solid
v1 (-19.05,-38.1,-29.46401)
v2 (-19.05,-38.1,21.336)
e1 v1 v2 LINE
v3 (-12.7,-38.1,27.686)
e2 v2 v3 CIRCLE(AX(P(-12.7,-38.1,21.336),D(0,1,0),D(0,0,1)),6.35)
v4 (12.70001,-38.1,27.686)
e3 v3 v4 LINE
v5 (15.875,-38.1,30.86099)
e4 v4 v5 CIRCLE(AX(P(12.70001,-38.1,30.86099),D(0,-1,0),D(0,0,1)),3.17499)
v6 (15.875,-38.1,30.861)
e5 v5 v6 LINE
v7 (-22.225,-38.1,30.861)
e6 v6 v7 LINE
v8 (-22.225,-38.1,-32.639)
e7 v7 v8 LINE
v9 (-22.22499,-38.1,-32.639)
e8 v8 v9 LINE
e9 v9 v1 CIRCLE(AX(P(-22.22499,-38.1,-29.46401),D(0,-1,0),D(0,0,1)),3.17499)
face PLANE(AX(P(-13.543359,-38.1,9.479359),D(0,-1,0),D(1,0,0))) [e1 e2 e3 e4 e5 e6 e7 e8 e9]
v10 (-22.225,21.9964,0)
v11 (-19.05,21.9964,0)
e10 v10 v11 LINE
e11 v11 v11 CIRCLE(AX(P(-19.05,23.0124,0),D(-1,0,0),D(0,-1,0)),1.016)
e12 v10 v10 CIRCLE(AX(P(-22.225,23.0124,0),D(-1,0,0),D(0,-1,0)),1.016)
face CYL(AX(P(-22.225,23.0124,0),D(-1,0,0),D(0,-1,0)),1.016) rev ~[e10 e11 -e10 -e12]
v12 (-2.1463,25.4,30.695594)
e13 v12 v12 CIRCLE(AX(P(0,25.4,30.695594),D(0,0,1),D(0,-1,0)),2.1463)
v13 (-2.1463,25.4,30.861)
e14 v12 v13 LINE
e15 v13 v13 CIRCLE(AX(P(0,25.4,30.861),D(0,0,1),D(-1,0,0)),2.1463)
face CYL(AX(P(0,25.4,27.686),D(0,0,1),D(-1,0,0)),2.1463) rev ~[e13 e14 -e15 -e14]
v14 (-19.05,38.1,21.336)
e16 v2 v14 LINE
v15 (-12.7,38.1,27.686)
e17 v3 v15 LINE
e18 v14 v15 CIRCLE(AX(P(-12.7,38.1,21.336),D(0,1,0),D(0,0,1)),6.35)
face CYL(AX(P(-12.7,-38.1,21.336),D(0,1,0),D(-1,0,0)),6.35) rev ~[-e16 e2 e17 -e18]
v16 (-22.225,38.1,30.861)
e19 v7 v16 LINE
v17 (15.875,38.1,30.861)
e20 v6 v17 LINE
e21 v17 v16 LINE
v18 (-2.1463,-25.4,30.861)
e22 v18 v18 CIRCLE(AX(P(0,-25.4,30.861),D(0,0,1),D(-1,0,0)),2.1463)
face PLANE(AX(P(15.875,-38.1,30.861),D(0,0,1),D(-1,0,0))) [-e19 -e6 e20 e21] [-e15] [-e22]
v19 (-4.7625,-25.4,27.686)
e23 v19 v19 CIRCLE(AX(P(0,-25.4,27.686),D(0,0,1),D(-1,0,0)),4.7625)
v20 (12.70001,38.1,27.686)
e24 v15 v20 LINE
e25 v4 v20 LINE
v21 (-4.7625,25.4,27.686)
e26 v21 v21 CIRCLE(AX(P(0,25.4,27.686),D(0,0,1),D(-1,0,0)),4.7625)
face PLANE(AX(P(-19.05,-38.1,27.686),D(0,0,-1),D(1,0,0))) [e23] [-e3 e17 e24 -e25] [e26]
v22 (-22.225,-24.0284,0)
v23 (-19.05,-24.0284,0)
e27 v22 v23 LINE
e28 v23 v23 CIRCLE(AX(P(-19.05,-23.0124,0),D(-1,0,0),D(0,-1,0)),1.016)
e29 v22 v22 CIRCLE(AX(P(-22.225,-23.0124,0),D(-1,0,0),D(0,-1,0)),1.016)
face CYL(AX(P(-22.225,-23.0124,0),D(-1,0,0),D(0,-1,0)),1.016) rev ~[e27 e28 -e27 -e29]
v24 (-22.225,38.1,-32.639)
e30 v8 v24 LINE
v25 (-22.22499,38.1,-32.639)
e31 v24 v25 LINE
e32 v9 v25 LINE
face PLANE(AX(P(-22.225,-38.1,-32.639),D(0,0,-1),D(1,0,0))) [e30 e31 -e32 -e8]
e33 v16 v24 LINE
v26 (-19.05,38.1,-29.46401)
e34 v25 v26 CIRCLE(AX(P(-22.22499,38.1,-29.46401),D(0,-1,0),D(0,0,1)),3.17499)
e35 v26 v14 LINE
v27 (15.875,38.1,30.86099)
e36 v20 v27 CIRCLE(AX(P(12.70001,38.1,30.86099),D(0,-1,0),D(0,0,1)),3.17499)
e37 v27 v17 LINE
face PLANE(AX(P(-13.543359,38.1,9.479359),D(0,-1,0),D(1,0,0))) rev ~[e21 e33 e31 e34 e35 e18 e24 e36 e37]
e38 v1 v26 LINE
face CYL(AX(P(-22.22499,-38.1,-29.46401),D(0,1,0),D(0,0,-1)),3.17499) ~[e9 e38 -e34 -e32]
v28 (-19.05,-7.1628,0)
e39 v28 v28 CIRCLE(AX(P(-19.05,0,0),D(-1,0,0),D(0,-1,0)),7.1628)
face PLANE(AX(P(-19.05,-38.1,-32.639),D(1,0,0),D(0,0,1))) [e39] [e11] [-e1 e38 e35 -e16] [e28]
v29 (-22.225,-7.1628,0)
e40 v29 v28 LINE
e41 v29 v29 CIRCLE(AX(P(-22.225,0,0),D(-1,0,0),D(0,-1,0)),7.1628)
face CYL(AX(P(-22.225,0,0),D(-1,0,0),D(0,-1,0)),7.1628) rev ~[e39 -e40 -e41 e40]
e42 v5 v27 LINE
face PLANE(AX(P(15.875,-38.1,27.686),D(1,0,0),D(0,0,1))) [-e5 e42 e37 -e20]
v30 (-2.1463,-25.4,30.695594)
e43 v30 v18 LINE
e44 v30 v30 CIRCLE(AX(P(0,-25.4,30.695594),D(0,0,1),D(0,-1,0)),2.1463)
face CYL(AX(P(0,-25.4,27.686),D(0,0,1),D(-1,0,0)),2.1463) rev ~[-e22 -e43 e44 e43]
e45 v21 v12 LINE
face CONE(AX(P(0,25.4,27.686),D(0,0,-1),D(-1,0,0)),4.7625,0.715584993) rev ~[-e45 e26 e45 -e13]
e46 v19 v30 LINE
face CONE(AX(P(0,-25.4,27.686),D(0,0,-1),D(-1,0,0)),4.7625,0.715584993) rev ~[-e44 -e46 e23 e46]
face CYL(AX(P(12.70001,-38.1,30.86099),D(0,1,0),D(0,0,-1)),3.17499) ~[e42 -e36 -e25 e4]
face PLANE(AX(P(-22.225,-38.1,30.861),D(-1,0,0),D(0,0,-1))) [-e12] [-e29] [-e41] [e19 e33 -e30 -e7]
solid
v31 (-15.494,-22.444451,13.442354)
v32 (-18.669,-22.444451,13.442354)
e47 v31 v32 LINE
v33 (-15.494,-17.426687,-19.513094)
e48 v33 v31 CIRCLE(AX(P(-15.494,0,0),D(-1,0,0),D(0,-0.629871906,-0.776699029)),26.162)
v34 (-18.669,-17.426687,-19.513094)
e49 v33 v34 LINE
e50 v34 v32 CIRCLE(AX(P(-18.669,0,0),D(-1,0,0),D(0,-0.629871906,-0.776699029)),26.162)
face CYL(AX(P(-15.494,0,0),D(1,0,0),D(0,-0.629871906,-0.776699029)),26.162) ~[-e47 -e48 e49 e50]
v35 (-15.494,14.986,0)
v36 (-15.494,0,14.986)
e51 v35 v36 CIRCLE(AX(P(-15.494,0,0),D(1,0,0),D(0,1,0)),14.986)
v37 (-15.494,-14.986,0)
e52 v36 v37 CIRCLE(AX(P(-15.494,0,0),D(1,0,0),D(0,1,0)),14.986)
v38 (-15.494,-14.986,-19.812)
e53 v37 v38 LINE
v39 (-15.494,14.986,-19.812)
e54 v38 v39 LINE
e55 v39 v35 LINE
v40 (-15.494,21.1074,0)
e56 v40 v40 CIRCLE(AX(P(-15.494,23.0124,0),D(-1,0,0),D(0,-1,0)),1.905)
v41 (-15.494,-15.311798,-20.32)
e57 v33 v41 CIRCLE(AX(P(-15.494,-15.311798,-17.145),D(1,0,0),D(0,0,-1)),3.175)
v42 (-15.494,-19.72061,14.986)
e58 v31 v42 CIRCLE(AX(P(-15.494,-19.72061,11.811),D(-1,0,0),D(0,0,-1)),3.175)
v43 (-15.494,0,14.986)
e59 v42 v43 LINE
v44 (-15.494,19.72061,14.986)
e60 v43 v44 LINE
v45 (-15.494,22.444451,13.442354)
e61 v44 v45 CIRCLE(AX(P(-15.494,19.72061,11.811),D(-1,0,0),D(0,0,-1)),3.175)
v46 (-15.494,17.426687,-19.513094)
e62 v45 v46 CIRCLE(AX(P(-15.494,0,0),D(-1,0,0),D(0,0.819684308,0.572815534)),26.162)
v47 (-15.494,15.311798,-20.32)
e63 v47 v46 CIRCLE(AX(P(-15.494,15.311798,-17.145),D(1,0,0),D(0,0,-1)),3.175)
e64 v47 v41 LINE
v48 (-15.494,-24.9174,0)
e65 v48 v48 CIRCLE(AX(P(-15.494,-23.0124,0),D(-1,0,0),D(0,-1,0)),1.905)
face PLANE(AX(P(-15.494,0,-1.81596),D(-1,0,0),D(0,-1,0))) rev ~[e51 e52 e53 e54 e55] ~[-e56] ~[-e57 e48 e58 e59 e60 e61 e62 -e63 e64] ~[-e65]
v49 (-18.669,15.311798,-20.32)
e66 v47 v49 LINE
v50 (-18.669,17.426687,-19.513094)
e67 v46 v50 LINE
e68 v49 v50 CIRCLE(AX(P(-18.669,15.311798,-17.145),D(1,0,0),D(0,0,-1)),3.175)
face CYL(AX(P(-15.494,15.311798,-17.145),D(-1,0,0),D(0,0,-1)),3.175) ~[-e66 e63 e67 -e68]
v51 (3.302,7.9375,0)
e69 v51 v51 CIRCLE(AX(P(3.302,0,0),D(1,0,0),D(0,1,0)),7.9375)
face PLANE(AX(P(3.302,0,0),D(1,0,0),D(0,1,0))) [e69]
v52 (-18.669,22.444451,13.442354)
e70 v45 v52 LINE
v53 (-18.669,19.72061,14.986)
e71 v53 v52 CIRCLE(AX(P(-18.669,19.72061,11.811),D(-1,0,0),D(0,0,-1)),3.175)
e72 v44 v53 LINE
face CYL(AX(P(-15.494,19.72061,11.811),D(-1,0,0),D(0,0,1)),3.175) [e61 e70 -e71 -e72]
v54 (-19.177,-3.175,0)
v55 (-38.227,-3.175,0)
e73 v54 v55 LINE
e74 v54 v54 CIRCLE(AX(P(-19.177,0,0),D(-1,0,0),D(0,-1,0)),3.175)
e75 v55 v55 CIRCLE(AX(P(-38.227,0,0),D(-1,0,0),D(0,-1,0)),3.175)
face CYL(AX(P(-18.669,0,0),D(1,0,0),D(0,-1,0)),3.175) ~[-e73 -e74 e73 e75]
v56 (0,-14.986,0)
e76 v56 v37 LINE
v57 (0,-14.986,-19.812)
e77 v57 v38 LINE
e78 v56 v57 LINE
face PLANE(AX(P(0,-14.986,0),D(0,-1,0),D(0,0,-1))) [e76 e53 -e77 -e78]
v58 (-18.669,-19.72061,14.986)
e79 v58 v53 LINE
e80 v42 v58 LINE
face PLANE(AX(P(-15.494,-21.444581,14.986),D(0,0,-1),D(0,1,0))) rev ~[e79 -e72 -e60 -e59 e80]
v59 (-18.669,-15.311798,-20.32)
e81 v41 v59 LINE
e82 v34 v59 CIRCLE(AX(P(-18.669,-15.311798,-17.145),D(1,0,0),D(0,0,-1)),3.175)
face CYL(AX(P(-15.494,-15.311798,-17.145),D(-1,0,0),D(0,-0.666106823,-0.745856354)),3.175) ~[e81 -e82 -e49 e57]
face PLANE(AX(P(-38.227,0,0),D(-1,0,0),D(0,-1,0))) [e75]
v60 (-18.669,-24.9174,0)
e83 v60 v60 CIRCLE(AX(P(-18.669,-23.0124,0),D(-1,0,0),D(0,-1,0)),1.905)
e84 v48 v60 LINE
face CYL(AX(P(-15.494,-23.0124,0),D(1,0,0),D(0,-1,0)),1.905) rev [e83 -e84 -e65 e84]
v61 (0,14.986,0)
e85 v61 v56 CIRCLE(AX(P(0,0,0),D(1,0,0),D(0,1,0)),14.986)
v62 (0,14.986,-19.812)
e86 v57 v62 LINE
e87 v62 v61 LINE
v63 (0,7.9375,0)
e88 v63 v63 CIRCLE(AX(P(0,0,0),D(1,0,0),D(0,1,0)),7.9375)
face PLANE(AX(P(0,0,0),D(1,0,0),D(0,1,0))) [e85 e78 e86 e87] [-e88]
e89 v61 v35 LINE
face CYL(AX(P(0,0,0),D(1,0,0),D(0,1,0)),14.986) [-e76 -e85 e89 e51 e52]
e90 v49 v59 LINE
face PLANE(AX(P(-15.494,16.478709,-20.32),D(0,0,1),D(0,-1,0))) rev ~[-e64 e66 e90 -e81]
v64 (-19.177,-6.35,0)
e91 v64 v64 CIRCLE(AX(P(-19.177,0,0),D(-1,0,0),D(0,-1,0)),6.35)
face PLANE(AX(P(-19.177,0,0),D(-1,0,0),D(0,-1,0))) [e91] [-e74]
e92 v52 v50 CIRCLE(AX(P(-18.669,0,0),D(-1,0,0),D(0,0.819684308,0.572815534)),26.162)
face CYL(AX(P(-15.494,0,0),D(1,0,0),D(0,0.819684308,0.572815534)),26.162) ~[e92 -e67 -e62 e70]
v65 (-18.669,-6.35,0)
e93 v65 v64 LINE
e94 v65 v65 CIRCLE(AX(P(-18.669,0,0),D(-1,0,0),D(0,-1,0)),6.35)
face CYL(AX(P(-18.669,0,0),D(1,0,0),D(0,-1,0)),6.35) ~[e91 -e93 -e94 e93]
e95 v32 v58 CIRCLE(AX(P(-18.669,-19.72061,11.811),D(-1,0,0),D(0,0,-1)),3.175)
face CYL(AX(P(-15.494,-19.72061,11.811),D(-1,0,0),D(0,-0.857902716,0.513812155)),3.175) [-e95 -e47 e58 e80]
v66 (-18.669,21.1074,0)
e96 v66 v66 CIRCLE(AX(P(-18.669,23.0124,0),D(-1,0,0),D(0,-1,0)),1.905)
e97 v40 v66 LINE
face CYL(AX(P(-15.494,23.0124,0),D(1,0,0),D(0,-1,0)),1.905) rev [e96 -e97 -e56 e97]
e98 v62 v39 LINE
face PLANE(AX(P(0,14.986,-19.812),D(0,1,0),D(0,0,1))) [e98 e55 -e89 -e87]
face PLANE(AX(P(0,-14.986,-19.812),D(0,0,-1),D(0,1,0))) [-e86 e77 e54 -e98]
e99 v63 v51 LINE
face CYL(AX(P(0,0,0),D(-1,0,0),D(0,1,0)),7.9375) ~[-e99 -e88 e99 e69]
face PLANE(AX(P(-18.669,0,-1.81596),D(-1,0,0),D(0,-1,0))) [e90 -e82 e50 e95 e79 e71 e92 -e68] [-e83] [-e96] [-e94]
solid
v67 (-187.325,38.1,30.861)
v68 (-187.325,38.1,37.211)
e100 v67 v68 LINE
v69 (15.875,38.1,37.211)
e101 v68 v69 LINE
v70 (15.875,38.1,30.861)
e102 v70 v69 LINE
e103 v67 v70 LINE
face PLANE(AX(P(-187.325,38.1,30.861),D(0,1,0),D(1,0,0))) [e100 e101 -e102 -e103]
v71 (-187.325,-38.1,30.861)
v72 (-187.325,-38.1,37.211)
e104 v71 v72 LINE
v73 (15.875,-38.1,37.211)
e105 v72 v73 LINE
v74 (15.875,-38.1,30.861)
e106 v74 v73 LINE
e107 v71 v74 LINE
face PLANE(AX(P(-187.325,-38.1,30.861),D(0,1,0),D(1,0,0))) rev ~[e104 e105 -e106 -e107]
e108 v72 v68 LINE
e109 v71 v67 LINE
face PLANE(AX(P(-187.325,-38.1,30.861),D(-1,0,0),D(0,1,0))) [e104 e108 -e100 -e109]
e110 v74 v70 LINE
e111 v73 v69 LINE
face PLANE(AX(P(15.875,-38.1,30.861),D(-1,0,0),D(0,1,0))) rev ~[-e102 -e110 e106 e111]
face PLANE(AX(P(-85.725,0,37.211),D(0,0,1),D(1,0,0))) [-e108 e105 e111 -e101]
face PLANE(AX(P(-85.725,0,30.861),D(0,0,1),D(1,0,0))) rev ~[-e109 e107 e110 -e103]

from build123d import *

# Parameters (mm, degrees)
F0_R            = 7.9375
F1_DEPTH        = 3.302
F2_DEPTH        = 15.494
F3_R            = 1.905
F3_R_2          = 3.175
F4_DEPTH        = 3.175
F5_R            = 3.175
F6_DEPTH        = 19.558
F5_R_2          = 6.35
F7_DEPTH        = 0.508
F8_R            = 3.175
F11_DEPTH       = 76.2
F12_R           = 3.17499
F13_R           = 6.35
F14_R           = 7.1628
F14_R_2         = 1.016
F15_DEPTH       = 25.4
F17_W           = 203.2
F17_H           = 76.2
F18_DEPTH       = 6.35
F20_D           = 4.2926
F20_DEPTH       = 19.05
F20_CSINK_D     = 9.525
F20_CSINK_ANGLE = 82
F20_TIP         = 1.2896271466


# Not quite as in the source:
# - a fillet or chamfer is up to 0.001 mm smaller than in the source, because OpenCascade refuses the exact size


with BuildPart() as f1:
    # F0 (on Right) → F1 (new body)
    with BuildSketch(Plane.YZ):
        Circle(F0_R)
    extrude(amount=F1_DEPTH)

    # F0 (on Right) → F2 (join)
    with BuildSketch(Plane.YZ):
        with BuildLine():
            ThreePointArc((-14.986, 0), (0, -14.986), (14.986, 0))
            ThreePointArc((14.986, 0), (0, 14.986), (-14.986, 0))
        make_face()
        Circle(F0_R, mode=Mode.SUBTRACT)
        with BuildLine():
            Line((14.986, -19.812), (14.986, 0))
            ThreePointArc((14.986, 0), (0, -14.986), (-14.986, 0))
            Line((-14.986, 0), (-14.986, -19.812))
            Line((-14.986, -19.812), (14.986, -19.812))
        make_face()
        Circle(F0_R)
    extrude(amount=-F2_DEPTH)

    # F3 (on face) → F4 (join)
    with BuildSketch(Plane(origin=(-15.494, 0, 0), x_dir=(0, -1, 0), z_dir=(-1, 0, 0))):
        with BuildLine():
            Line((-2.18e-08, 14.986), (-21.4445808539, 14.986))
            ThreePointArc((-21.4445808539, 14.986), (-25.9069948799, -3.6438798406), (-16.4787088086, -20.32))
            Line((-16.4787088086, -20.32), (16.4787088086, -20.32))
            ThreePointArc((16.4787088086, -20.32), (25.9069948799, -3.6438798406), (21.4445808539, 14.986))
            Line((21.4445808539, 14.986), (-2.18e-08, 14.986))
        make_face()
        with Locations((-23.0124, 0)):
            Circle(F3_R, mode=Mode.SUBTRACT)
        with BuildLine():
            ThreePointArc((-14.986, 0), (-10.5967022306, 10.5967022152), (-2.18e-08, 14.986))
            ThreePointArc((-2.18e-08, 14.986), (10.5967022152, 10.5967022306), (14.986, 0))
            Line((14.986, 0), (14.986, -19.812))
            Line((14.986, -19.812), (-14.986, -19.812))
            Line((-14.986, -19.812), (-14.986, 0))
        make_face(mode=Mode.SUBTRACT)
        with Locations((23.0124, 0)):
            Circle(F3_R, mode=Mode.SUBTRACT)
        with BuildLine():
            ThreePointArc((14.986, 0), (10.5967022152, 10.5967022306), (-2.18e-08, 14.986))
            ThreePointArc((-2.18e-08, 14.986), (-10.5967022306, 10.5967022152), (-14.986, 0))
            Line((-14.986, 0), (-14.986, -19.812))
            Line((-14.986, -19.812), (14.986, -19.812))
            Line((14.986, -19.812), (14.986, 0))
        make_face()
        Circle(F3_R_2, mode=Mode.SUBTRACT)
        Circle(F3_R_2)
    extrude(amount=F4_DEPTH)

    # F5 (on face) → F6 (join)
    with BuildSketch(Plane(origin=(-18.669, 0, 0), x_dir=(0, -1, 0), z_dir=(-1, 0, 0))):
        Circle(F5_R)
    extrude(amount=F6_DEPTH)

    # F5 (on face) → F7 (join)
    with BuildSketch(Plane(origin=(-18.669, 0, 0), x_dir=(0, -1, 0), z_dir=(-1, 0, 0))):
        Circle(F5_R_2)
        Circle(F5_R, mode=Mode.SUBTRACT)
    extrude(amount=F7_DEPTH)

    # F8
    f8_edges = [f1.edges().sort_by_distance(p)[0] for p in [
        (-17.0815, -21.444581, 14.986),
        (-17.0815, 21.444581, 14.986),
        (-17.0815, 16.478709, -20.32),
        (-17.0815, -16.478709, -20.32),
    ]]
    fillet(f8_edges, radius=F8_R)


with BuildPart() as f11:
    # F10 (on offset) → F11 (new body)
    with BuildSketch(Plane.XZ.offset(38.1)):
        Polygon((-22.225, 30.861), (-22.225, -32.639), (-19.05, -32.639), (-19.05, 27.686), (15.875, 27.686), (15.875, 30.861), align=None)
    extrude(amount=-F11_DEPTH)

    # F12 (radius 3.175 in the source; OpenCascade refuses exactly that, so slightly less here)
    f12_edges = [f11.edges().sort_by_distance(p)[0] for p in [
        (15.875, 0, 27.686),
        (-19.05, 0, -32.639),
    ]]
    fillet(f12_edges, radius=F12_R)

    # F13
    f13_edges = [f11.edges().sort_by_distance(p)[0] for p in [
        (-19.05, 0, 27.686),
    ]]
    fillet(f13_edges, radius=F13_R)

    # F14 (on face) → F15 (cut)
    with BuildSketch(Plane(origin=(-22.225, 0, 0), x_dir=(0, -1, 0), z_dir=(-1, 0, 0))):
        Circle(F14_R)
        with Locations((23.0124, 0)):
            Circle(F14_R_2)
        with Locations((-23.0124, 0)):
            Circle(F14_R_2)
    extrude(amount=-F15_DEPTH, mode=Mode.SUBTRACT)

    # F20
    with Locations(Plane(origin=(0, 0, 27.686), x_dir=(1, 0, 0), z_dir=(0, 0, -1))):
        with Locations((0, -25.4), (0, 25.4)):
            CounterSinkHole(F20_D / 2, F20_CSINK_D / 2, depth=F20_DEPTH, counter_sink_angle=F20_CSINK_ANGLE)
            with Locations((0, 0, -(F20_DEPTH + F20_TIP / 2))):  # 118° drill point
                Cone(0, F20_D / 2, F20_TIP, mode=Mode.SUBTRACT)


with BuildPart() as f18:
    # F17 (on face) → F18 (new body)
    with BuildSketch(Plane.XY.offset(30.861)):
        with Locations((-85.725, 0)):
            Rectangle(F17_W, F17_H)
    extrude(amount=F18_DEPTH)


solid = Compound([f1.part, f11.part, f18.part])
